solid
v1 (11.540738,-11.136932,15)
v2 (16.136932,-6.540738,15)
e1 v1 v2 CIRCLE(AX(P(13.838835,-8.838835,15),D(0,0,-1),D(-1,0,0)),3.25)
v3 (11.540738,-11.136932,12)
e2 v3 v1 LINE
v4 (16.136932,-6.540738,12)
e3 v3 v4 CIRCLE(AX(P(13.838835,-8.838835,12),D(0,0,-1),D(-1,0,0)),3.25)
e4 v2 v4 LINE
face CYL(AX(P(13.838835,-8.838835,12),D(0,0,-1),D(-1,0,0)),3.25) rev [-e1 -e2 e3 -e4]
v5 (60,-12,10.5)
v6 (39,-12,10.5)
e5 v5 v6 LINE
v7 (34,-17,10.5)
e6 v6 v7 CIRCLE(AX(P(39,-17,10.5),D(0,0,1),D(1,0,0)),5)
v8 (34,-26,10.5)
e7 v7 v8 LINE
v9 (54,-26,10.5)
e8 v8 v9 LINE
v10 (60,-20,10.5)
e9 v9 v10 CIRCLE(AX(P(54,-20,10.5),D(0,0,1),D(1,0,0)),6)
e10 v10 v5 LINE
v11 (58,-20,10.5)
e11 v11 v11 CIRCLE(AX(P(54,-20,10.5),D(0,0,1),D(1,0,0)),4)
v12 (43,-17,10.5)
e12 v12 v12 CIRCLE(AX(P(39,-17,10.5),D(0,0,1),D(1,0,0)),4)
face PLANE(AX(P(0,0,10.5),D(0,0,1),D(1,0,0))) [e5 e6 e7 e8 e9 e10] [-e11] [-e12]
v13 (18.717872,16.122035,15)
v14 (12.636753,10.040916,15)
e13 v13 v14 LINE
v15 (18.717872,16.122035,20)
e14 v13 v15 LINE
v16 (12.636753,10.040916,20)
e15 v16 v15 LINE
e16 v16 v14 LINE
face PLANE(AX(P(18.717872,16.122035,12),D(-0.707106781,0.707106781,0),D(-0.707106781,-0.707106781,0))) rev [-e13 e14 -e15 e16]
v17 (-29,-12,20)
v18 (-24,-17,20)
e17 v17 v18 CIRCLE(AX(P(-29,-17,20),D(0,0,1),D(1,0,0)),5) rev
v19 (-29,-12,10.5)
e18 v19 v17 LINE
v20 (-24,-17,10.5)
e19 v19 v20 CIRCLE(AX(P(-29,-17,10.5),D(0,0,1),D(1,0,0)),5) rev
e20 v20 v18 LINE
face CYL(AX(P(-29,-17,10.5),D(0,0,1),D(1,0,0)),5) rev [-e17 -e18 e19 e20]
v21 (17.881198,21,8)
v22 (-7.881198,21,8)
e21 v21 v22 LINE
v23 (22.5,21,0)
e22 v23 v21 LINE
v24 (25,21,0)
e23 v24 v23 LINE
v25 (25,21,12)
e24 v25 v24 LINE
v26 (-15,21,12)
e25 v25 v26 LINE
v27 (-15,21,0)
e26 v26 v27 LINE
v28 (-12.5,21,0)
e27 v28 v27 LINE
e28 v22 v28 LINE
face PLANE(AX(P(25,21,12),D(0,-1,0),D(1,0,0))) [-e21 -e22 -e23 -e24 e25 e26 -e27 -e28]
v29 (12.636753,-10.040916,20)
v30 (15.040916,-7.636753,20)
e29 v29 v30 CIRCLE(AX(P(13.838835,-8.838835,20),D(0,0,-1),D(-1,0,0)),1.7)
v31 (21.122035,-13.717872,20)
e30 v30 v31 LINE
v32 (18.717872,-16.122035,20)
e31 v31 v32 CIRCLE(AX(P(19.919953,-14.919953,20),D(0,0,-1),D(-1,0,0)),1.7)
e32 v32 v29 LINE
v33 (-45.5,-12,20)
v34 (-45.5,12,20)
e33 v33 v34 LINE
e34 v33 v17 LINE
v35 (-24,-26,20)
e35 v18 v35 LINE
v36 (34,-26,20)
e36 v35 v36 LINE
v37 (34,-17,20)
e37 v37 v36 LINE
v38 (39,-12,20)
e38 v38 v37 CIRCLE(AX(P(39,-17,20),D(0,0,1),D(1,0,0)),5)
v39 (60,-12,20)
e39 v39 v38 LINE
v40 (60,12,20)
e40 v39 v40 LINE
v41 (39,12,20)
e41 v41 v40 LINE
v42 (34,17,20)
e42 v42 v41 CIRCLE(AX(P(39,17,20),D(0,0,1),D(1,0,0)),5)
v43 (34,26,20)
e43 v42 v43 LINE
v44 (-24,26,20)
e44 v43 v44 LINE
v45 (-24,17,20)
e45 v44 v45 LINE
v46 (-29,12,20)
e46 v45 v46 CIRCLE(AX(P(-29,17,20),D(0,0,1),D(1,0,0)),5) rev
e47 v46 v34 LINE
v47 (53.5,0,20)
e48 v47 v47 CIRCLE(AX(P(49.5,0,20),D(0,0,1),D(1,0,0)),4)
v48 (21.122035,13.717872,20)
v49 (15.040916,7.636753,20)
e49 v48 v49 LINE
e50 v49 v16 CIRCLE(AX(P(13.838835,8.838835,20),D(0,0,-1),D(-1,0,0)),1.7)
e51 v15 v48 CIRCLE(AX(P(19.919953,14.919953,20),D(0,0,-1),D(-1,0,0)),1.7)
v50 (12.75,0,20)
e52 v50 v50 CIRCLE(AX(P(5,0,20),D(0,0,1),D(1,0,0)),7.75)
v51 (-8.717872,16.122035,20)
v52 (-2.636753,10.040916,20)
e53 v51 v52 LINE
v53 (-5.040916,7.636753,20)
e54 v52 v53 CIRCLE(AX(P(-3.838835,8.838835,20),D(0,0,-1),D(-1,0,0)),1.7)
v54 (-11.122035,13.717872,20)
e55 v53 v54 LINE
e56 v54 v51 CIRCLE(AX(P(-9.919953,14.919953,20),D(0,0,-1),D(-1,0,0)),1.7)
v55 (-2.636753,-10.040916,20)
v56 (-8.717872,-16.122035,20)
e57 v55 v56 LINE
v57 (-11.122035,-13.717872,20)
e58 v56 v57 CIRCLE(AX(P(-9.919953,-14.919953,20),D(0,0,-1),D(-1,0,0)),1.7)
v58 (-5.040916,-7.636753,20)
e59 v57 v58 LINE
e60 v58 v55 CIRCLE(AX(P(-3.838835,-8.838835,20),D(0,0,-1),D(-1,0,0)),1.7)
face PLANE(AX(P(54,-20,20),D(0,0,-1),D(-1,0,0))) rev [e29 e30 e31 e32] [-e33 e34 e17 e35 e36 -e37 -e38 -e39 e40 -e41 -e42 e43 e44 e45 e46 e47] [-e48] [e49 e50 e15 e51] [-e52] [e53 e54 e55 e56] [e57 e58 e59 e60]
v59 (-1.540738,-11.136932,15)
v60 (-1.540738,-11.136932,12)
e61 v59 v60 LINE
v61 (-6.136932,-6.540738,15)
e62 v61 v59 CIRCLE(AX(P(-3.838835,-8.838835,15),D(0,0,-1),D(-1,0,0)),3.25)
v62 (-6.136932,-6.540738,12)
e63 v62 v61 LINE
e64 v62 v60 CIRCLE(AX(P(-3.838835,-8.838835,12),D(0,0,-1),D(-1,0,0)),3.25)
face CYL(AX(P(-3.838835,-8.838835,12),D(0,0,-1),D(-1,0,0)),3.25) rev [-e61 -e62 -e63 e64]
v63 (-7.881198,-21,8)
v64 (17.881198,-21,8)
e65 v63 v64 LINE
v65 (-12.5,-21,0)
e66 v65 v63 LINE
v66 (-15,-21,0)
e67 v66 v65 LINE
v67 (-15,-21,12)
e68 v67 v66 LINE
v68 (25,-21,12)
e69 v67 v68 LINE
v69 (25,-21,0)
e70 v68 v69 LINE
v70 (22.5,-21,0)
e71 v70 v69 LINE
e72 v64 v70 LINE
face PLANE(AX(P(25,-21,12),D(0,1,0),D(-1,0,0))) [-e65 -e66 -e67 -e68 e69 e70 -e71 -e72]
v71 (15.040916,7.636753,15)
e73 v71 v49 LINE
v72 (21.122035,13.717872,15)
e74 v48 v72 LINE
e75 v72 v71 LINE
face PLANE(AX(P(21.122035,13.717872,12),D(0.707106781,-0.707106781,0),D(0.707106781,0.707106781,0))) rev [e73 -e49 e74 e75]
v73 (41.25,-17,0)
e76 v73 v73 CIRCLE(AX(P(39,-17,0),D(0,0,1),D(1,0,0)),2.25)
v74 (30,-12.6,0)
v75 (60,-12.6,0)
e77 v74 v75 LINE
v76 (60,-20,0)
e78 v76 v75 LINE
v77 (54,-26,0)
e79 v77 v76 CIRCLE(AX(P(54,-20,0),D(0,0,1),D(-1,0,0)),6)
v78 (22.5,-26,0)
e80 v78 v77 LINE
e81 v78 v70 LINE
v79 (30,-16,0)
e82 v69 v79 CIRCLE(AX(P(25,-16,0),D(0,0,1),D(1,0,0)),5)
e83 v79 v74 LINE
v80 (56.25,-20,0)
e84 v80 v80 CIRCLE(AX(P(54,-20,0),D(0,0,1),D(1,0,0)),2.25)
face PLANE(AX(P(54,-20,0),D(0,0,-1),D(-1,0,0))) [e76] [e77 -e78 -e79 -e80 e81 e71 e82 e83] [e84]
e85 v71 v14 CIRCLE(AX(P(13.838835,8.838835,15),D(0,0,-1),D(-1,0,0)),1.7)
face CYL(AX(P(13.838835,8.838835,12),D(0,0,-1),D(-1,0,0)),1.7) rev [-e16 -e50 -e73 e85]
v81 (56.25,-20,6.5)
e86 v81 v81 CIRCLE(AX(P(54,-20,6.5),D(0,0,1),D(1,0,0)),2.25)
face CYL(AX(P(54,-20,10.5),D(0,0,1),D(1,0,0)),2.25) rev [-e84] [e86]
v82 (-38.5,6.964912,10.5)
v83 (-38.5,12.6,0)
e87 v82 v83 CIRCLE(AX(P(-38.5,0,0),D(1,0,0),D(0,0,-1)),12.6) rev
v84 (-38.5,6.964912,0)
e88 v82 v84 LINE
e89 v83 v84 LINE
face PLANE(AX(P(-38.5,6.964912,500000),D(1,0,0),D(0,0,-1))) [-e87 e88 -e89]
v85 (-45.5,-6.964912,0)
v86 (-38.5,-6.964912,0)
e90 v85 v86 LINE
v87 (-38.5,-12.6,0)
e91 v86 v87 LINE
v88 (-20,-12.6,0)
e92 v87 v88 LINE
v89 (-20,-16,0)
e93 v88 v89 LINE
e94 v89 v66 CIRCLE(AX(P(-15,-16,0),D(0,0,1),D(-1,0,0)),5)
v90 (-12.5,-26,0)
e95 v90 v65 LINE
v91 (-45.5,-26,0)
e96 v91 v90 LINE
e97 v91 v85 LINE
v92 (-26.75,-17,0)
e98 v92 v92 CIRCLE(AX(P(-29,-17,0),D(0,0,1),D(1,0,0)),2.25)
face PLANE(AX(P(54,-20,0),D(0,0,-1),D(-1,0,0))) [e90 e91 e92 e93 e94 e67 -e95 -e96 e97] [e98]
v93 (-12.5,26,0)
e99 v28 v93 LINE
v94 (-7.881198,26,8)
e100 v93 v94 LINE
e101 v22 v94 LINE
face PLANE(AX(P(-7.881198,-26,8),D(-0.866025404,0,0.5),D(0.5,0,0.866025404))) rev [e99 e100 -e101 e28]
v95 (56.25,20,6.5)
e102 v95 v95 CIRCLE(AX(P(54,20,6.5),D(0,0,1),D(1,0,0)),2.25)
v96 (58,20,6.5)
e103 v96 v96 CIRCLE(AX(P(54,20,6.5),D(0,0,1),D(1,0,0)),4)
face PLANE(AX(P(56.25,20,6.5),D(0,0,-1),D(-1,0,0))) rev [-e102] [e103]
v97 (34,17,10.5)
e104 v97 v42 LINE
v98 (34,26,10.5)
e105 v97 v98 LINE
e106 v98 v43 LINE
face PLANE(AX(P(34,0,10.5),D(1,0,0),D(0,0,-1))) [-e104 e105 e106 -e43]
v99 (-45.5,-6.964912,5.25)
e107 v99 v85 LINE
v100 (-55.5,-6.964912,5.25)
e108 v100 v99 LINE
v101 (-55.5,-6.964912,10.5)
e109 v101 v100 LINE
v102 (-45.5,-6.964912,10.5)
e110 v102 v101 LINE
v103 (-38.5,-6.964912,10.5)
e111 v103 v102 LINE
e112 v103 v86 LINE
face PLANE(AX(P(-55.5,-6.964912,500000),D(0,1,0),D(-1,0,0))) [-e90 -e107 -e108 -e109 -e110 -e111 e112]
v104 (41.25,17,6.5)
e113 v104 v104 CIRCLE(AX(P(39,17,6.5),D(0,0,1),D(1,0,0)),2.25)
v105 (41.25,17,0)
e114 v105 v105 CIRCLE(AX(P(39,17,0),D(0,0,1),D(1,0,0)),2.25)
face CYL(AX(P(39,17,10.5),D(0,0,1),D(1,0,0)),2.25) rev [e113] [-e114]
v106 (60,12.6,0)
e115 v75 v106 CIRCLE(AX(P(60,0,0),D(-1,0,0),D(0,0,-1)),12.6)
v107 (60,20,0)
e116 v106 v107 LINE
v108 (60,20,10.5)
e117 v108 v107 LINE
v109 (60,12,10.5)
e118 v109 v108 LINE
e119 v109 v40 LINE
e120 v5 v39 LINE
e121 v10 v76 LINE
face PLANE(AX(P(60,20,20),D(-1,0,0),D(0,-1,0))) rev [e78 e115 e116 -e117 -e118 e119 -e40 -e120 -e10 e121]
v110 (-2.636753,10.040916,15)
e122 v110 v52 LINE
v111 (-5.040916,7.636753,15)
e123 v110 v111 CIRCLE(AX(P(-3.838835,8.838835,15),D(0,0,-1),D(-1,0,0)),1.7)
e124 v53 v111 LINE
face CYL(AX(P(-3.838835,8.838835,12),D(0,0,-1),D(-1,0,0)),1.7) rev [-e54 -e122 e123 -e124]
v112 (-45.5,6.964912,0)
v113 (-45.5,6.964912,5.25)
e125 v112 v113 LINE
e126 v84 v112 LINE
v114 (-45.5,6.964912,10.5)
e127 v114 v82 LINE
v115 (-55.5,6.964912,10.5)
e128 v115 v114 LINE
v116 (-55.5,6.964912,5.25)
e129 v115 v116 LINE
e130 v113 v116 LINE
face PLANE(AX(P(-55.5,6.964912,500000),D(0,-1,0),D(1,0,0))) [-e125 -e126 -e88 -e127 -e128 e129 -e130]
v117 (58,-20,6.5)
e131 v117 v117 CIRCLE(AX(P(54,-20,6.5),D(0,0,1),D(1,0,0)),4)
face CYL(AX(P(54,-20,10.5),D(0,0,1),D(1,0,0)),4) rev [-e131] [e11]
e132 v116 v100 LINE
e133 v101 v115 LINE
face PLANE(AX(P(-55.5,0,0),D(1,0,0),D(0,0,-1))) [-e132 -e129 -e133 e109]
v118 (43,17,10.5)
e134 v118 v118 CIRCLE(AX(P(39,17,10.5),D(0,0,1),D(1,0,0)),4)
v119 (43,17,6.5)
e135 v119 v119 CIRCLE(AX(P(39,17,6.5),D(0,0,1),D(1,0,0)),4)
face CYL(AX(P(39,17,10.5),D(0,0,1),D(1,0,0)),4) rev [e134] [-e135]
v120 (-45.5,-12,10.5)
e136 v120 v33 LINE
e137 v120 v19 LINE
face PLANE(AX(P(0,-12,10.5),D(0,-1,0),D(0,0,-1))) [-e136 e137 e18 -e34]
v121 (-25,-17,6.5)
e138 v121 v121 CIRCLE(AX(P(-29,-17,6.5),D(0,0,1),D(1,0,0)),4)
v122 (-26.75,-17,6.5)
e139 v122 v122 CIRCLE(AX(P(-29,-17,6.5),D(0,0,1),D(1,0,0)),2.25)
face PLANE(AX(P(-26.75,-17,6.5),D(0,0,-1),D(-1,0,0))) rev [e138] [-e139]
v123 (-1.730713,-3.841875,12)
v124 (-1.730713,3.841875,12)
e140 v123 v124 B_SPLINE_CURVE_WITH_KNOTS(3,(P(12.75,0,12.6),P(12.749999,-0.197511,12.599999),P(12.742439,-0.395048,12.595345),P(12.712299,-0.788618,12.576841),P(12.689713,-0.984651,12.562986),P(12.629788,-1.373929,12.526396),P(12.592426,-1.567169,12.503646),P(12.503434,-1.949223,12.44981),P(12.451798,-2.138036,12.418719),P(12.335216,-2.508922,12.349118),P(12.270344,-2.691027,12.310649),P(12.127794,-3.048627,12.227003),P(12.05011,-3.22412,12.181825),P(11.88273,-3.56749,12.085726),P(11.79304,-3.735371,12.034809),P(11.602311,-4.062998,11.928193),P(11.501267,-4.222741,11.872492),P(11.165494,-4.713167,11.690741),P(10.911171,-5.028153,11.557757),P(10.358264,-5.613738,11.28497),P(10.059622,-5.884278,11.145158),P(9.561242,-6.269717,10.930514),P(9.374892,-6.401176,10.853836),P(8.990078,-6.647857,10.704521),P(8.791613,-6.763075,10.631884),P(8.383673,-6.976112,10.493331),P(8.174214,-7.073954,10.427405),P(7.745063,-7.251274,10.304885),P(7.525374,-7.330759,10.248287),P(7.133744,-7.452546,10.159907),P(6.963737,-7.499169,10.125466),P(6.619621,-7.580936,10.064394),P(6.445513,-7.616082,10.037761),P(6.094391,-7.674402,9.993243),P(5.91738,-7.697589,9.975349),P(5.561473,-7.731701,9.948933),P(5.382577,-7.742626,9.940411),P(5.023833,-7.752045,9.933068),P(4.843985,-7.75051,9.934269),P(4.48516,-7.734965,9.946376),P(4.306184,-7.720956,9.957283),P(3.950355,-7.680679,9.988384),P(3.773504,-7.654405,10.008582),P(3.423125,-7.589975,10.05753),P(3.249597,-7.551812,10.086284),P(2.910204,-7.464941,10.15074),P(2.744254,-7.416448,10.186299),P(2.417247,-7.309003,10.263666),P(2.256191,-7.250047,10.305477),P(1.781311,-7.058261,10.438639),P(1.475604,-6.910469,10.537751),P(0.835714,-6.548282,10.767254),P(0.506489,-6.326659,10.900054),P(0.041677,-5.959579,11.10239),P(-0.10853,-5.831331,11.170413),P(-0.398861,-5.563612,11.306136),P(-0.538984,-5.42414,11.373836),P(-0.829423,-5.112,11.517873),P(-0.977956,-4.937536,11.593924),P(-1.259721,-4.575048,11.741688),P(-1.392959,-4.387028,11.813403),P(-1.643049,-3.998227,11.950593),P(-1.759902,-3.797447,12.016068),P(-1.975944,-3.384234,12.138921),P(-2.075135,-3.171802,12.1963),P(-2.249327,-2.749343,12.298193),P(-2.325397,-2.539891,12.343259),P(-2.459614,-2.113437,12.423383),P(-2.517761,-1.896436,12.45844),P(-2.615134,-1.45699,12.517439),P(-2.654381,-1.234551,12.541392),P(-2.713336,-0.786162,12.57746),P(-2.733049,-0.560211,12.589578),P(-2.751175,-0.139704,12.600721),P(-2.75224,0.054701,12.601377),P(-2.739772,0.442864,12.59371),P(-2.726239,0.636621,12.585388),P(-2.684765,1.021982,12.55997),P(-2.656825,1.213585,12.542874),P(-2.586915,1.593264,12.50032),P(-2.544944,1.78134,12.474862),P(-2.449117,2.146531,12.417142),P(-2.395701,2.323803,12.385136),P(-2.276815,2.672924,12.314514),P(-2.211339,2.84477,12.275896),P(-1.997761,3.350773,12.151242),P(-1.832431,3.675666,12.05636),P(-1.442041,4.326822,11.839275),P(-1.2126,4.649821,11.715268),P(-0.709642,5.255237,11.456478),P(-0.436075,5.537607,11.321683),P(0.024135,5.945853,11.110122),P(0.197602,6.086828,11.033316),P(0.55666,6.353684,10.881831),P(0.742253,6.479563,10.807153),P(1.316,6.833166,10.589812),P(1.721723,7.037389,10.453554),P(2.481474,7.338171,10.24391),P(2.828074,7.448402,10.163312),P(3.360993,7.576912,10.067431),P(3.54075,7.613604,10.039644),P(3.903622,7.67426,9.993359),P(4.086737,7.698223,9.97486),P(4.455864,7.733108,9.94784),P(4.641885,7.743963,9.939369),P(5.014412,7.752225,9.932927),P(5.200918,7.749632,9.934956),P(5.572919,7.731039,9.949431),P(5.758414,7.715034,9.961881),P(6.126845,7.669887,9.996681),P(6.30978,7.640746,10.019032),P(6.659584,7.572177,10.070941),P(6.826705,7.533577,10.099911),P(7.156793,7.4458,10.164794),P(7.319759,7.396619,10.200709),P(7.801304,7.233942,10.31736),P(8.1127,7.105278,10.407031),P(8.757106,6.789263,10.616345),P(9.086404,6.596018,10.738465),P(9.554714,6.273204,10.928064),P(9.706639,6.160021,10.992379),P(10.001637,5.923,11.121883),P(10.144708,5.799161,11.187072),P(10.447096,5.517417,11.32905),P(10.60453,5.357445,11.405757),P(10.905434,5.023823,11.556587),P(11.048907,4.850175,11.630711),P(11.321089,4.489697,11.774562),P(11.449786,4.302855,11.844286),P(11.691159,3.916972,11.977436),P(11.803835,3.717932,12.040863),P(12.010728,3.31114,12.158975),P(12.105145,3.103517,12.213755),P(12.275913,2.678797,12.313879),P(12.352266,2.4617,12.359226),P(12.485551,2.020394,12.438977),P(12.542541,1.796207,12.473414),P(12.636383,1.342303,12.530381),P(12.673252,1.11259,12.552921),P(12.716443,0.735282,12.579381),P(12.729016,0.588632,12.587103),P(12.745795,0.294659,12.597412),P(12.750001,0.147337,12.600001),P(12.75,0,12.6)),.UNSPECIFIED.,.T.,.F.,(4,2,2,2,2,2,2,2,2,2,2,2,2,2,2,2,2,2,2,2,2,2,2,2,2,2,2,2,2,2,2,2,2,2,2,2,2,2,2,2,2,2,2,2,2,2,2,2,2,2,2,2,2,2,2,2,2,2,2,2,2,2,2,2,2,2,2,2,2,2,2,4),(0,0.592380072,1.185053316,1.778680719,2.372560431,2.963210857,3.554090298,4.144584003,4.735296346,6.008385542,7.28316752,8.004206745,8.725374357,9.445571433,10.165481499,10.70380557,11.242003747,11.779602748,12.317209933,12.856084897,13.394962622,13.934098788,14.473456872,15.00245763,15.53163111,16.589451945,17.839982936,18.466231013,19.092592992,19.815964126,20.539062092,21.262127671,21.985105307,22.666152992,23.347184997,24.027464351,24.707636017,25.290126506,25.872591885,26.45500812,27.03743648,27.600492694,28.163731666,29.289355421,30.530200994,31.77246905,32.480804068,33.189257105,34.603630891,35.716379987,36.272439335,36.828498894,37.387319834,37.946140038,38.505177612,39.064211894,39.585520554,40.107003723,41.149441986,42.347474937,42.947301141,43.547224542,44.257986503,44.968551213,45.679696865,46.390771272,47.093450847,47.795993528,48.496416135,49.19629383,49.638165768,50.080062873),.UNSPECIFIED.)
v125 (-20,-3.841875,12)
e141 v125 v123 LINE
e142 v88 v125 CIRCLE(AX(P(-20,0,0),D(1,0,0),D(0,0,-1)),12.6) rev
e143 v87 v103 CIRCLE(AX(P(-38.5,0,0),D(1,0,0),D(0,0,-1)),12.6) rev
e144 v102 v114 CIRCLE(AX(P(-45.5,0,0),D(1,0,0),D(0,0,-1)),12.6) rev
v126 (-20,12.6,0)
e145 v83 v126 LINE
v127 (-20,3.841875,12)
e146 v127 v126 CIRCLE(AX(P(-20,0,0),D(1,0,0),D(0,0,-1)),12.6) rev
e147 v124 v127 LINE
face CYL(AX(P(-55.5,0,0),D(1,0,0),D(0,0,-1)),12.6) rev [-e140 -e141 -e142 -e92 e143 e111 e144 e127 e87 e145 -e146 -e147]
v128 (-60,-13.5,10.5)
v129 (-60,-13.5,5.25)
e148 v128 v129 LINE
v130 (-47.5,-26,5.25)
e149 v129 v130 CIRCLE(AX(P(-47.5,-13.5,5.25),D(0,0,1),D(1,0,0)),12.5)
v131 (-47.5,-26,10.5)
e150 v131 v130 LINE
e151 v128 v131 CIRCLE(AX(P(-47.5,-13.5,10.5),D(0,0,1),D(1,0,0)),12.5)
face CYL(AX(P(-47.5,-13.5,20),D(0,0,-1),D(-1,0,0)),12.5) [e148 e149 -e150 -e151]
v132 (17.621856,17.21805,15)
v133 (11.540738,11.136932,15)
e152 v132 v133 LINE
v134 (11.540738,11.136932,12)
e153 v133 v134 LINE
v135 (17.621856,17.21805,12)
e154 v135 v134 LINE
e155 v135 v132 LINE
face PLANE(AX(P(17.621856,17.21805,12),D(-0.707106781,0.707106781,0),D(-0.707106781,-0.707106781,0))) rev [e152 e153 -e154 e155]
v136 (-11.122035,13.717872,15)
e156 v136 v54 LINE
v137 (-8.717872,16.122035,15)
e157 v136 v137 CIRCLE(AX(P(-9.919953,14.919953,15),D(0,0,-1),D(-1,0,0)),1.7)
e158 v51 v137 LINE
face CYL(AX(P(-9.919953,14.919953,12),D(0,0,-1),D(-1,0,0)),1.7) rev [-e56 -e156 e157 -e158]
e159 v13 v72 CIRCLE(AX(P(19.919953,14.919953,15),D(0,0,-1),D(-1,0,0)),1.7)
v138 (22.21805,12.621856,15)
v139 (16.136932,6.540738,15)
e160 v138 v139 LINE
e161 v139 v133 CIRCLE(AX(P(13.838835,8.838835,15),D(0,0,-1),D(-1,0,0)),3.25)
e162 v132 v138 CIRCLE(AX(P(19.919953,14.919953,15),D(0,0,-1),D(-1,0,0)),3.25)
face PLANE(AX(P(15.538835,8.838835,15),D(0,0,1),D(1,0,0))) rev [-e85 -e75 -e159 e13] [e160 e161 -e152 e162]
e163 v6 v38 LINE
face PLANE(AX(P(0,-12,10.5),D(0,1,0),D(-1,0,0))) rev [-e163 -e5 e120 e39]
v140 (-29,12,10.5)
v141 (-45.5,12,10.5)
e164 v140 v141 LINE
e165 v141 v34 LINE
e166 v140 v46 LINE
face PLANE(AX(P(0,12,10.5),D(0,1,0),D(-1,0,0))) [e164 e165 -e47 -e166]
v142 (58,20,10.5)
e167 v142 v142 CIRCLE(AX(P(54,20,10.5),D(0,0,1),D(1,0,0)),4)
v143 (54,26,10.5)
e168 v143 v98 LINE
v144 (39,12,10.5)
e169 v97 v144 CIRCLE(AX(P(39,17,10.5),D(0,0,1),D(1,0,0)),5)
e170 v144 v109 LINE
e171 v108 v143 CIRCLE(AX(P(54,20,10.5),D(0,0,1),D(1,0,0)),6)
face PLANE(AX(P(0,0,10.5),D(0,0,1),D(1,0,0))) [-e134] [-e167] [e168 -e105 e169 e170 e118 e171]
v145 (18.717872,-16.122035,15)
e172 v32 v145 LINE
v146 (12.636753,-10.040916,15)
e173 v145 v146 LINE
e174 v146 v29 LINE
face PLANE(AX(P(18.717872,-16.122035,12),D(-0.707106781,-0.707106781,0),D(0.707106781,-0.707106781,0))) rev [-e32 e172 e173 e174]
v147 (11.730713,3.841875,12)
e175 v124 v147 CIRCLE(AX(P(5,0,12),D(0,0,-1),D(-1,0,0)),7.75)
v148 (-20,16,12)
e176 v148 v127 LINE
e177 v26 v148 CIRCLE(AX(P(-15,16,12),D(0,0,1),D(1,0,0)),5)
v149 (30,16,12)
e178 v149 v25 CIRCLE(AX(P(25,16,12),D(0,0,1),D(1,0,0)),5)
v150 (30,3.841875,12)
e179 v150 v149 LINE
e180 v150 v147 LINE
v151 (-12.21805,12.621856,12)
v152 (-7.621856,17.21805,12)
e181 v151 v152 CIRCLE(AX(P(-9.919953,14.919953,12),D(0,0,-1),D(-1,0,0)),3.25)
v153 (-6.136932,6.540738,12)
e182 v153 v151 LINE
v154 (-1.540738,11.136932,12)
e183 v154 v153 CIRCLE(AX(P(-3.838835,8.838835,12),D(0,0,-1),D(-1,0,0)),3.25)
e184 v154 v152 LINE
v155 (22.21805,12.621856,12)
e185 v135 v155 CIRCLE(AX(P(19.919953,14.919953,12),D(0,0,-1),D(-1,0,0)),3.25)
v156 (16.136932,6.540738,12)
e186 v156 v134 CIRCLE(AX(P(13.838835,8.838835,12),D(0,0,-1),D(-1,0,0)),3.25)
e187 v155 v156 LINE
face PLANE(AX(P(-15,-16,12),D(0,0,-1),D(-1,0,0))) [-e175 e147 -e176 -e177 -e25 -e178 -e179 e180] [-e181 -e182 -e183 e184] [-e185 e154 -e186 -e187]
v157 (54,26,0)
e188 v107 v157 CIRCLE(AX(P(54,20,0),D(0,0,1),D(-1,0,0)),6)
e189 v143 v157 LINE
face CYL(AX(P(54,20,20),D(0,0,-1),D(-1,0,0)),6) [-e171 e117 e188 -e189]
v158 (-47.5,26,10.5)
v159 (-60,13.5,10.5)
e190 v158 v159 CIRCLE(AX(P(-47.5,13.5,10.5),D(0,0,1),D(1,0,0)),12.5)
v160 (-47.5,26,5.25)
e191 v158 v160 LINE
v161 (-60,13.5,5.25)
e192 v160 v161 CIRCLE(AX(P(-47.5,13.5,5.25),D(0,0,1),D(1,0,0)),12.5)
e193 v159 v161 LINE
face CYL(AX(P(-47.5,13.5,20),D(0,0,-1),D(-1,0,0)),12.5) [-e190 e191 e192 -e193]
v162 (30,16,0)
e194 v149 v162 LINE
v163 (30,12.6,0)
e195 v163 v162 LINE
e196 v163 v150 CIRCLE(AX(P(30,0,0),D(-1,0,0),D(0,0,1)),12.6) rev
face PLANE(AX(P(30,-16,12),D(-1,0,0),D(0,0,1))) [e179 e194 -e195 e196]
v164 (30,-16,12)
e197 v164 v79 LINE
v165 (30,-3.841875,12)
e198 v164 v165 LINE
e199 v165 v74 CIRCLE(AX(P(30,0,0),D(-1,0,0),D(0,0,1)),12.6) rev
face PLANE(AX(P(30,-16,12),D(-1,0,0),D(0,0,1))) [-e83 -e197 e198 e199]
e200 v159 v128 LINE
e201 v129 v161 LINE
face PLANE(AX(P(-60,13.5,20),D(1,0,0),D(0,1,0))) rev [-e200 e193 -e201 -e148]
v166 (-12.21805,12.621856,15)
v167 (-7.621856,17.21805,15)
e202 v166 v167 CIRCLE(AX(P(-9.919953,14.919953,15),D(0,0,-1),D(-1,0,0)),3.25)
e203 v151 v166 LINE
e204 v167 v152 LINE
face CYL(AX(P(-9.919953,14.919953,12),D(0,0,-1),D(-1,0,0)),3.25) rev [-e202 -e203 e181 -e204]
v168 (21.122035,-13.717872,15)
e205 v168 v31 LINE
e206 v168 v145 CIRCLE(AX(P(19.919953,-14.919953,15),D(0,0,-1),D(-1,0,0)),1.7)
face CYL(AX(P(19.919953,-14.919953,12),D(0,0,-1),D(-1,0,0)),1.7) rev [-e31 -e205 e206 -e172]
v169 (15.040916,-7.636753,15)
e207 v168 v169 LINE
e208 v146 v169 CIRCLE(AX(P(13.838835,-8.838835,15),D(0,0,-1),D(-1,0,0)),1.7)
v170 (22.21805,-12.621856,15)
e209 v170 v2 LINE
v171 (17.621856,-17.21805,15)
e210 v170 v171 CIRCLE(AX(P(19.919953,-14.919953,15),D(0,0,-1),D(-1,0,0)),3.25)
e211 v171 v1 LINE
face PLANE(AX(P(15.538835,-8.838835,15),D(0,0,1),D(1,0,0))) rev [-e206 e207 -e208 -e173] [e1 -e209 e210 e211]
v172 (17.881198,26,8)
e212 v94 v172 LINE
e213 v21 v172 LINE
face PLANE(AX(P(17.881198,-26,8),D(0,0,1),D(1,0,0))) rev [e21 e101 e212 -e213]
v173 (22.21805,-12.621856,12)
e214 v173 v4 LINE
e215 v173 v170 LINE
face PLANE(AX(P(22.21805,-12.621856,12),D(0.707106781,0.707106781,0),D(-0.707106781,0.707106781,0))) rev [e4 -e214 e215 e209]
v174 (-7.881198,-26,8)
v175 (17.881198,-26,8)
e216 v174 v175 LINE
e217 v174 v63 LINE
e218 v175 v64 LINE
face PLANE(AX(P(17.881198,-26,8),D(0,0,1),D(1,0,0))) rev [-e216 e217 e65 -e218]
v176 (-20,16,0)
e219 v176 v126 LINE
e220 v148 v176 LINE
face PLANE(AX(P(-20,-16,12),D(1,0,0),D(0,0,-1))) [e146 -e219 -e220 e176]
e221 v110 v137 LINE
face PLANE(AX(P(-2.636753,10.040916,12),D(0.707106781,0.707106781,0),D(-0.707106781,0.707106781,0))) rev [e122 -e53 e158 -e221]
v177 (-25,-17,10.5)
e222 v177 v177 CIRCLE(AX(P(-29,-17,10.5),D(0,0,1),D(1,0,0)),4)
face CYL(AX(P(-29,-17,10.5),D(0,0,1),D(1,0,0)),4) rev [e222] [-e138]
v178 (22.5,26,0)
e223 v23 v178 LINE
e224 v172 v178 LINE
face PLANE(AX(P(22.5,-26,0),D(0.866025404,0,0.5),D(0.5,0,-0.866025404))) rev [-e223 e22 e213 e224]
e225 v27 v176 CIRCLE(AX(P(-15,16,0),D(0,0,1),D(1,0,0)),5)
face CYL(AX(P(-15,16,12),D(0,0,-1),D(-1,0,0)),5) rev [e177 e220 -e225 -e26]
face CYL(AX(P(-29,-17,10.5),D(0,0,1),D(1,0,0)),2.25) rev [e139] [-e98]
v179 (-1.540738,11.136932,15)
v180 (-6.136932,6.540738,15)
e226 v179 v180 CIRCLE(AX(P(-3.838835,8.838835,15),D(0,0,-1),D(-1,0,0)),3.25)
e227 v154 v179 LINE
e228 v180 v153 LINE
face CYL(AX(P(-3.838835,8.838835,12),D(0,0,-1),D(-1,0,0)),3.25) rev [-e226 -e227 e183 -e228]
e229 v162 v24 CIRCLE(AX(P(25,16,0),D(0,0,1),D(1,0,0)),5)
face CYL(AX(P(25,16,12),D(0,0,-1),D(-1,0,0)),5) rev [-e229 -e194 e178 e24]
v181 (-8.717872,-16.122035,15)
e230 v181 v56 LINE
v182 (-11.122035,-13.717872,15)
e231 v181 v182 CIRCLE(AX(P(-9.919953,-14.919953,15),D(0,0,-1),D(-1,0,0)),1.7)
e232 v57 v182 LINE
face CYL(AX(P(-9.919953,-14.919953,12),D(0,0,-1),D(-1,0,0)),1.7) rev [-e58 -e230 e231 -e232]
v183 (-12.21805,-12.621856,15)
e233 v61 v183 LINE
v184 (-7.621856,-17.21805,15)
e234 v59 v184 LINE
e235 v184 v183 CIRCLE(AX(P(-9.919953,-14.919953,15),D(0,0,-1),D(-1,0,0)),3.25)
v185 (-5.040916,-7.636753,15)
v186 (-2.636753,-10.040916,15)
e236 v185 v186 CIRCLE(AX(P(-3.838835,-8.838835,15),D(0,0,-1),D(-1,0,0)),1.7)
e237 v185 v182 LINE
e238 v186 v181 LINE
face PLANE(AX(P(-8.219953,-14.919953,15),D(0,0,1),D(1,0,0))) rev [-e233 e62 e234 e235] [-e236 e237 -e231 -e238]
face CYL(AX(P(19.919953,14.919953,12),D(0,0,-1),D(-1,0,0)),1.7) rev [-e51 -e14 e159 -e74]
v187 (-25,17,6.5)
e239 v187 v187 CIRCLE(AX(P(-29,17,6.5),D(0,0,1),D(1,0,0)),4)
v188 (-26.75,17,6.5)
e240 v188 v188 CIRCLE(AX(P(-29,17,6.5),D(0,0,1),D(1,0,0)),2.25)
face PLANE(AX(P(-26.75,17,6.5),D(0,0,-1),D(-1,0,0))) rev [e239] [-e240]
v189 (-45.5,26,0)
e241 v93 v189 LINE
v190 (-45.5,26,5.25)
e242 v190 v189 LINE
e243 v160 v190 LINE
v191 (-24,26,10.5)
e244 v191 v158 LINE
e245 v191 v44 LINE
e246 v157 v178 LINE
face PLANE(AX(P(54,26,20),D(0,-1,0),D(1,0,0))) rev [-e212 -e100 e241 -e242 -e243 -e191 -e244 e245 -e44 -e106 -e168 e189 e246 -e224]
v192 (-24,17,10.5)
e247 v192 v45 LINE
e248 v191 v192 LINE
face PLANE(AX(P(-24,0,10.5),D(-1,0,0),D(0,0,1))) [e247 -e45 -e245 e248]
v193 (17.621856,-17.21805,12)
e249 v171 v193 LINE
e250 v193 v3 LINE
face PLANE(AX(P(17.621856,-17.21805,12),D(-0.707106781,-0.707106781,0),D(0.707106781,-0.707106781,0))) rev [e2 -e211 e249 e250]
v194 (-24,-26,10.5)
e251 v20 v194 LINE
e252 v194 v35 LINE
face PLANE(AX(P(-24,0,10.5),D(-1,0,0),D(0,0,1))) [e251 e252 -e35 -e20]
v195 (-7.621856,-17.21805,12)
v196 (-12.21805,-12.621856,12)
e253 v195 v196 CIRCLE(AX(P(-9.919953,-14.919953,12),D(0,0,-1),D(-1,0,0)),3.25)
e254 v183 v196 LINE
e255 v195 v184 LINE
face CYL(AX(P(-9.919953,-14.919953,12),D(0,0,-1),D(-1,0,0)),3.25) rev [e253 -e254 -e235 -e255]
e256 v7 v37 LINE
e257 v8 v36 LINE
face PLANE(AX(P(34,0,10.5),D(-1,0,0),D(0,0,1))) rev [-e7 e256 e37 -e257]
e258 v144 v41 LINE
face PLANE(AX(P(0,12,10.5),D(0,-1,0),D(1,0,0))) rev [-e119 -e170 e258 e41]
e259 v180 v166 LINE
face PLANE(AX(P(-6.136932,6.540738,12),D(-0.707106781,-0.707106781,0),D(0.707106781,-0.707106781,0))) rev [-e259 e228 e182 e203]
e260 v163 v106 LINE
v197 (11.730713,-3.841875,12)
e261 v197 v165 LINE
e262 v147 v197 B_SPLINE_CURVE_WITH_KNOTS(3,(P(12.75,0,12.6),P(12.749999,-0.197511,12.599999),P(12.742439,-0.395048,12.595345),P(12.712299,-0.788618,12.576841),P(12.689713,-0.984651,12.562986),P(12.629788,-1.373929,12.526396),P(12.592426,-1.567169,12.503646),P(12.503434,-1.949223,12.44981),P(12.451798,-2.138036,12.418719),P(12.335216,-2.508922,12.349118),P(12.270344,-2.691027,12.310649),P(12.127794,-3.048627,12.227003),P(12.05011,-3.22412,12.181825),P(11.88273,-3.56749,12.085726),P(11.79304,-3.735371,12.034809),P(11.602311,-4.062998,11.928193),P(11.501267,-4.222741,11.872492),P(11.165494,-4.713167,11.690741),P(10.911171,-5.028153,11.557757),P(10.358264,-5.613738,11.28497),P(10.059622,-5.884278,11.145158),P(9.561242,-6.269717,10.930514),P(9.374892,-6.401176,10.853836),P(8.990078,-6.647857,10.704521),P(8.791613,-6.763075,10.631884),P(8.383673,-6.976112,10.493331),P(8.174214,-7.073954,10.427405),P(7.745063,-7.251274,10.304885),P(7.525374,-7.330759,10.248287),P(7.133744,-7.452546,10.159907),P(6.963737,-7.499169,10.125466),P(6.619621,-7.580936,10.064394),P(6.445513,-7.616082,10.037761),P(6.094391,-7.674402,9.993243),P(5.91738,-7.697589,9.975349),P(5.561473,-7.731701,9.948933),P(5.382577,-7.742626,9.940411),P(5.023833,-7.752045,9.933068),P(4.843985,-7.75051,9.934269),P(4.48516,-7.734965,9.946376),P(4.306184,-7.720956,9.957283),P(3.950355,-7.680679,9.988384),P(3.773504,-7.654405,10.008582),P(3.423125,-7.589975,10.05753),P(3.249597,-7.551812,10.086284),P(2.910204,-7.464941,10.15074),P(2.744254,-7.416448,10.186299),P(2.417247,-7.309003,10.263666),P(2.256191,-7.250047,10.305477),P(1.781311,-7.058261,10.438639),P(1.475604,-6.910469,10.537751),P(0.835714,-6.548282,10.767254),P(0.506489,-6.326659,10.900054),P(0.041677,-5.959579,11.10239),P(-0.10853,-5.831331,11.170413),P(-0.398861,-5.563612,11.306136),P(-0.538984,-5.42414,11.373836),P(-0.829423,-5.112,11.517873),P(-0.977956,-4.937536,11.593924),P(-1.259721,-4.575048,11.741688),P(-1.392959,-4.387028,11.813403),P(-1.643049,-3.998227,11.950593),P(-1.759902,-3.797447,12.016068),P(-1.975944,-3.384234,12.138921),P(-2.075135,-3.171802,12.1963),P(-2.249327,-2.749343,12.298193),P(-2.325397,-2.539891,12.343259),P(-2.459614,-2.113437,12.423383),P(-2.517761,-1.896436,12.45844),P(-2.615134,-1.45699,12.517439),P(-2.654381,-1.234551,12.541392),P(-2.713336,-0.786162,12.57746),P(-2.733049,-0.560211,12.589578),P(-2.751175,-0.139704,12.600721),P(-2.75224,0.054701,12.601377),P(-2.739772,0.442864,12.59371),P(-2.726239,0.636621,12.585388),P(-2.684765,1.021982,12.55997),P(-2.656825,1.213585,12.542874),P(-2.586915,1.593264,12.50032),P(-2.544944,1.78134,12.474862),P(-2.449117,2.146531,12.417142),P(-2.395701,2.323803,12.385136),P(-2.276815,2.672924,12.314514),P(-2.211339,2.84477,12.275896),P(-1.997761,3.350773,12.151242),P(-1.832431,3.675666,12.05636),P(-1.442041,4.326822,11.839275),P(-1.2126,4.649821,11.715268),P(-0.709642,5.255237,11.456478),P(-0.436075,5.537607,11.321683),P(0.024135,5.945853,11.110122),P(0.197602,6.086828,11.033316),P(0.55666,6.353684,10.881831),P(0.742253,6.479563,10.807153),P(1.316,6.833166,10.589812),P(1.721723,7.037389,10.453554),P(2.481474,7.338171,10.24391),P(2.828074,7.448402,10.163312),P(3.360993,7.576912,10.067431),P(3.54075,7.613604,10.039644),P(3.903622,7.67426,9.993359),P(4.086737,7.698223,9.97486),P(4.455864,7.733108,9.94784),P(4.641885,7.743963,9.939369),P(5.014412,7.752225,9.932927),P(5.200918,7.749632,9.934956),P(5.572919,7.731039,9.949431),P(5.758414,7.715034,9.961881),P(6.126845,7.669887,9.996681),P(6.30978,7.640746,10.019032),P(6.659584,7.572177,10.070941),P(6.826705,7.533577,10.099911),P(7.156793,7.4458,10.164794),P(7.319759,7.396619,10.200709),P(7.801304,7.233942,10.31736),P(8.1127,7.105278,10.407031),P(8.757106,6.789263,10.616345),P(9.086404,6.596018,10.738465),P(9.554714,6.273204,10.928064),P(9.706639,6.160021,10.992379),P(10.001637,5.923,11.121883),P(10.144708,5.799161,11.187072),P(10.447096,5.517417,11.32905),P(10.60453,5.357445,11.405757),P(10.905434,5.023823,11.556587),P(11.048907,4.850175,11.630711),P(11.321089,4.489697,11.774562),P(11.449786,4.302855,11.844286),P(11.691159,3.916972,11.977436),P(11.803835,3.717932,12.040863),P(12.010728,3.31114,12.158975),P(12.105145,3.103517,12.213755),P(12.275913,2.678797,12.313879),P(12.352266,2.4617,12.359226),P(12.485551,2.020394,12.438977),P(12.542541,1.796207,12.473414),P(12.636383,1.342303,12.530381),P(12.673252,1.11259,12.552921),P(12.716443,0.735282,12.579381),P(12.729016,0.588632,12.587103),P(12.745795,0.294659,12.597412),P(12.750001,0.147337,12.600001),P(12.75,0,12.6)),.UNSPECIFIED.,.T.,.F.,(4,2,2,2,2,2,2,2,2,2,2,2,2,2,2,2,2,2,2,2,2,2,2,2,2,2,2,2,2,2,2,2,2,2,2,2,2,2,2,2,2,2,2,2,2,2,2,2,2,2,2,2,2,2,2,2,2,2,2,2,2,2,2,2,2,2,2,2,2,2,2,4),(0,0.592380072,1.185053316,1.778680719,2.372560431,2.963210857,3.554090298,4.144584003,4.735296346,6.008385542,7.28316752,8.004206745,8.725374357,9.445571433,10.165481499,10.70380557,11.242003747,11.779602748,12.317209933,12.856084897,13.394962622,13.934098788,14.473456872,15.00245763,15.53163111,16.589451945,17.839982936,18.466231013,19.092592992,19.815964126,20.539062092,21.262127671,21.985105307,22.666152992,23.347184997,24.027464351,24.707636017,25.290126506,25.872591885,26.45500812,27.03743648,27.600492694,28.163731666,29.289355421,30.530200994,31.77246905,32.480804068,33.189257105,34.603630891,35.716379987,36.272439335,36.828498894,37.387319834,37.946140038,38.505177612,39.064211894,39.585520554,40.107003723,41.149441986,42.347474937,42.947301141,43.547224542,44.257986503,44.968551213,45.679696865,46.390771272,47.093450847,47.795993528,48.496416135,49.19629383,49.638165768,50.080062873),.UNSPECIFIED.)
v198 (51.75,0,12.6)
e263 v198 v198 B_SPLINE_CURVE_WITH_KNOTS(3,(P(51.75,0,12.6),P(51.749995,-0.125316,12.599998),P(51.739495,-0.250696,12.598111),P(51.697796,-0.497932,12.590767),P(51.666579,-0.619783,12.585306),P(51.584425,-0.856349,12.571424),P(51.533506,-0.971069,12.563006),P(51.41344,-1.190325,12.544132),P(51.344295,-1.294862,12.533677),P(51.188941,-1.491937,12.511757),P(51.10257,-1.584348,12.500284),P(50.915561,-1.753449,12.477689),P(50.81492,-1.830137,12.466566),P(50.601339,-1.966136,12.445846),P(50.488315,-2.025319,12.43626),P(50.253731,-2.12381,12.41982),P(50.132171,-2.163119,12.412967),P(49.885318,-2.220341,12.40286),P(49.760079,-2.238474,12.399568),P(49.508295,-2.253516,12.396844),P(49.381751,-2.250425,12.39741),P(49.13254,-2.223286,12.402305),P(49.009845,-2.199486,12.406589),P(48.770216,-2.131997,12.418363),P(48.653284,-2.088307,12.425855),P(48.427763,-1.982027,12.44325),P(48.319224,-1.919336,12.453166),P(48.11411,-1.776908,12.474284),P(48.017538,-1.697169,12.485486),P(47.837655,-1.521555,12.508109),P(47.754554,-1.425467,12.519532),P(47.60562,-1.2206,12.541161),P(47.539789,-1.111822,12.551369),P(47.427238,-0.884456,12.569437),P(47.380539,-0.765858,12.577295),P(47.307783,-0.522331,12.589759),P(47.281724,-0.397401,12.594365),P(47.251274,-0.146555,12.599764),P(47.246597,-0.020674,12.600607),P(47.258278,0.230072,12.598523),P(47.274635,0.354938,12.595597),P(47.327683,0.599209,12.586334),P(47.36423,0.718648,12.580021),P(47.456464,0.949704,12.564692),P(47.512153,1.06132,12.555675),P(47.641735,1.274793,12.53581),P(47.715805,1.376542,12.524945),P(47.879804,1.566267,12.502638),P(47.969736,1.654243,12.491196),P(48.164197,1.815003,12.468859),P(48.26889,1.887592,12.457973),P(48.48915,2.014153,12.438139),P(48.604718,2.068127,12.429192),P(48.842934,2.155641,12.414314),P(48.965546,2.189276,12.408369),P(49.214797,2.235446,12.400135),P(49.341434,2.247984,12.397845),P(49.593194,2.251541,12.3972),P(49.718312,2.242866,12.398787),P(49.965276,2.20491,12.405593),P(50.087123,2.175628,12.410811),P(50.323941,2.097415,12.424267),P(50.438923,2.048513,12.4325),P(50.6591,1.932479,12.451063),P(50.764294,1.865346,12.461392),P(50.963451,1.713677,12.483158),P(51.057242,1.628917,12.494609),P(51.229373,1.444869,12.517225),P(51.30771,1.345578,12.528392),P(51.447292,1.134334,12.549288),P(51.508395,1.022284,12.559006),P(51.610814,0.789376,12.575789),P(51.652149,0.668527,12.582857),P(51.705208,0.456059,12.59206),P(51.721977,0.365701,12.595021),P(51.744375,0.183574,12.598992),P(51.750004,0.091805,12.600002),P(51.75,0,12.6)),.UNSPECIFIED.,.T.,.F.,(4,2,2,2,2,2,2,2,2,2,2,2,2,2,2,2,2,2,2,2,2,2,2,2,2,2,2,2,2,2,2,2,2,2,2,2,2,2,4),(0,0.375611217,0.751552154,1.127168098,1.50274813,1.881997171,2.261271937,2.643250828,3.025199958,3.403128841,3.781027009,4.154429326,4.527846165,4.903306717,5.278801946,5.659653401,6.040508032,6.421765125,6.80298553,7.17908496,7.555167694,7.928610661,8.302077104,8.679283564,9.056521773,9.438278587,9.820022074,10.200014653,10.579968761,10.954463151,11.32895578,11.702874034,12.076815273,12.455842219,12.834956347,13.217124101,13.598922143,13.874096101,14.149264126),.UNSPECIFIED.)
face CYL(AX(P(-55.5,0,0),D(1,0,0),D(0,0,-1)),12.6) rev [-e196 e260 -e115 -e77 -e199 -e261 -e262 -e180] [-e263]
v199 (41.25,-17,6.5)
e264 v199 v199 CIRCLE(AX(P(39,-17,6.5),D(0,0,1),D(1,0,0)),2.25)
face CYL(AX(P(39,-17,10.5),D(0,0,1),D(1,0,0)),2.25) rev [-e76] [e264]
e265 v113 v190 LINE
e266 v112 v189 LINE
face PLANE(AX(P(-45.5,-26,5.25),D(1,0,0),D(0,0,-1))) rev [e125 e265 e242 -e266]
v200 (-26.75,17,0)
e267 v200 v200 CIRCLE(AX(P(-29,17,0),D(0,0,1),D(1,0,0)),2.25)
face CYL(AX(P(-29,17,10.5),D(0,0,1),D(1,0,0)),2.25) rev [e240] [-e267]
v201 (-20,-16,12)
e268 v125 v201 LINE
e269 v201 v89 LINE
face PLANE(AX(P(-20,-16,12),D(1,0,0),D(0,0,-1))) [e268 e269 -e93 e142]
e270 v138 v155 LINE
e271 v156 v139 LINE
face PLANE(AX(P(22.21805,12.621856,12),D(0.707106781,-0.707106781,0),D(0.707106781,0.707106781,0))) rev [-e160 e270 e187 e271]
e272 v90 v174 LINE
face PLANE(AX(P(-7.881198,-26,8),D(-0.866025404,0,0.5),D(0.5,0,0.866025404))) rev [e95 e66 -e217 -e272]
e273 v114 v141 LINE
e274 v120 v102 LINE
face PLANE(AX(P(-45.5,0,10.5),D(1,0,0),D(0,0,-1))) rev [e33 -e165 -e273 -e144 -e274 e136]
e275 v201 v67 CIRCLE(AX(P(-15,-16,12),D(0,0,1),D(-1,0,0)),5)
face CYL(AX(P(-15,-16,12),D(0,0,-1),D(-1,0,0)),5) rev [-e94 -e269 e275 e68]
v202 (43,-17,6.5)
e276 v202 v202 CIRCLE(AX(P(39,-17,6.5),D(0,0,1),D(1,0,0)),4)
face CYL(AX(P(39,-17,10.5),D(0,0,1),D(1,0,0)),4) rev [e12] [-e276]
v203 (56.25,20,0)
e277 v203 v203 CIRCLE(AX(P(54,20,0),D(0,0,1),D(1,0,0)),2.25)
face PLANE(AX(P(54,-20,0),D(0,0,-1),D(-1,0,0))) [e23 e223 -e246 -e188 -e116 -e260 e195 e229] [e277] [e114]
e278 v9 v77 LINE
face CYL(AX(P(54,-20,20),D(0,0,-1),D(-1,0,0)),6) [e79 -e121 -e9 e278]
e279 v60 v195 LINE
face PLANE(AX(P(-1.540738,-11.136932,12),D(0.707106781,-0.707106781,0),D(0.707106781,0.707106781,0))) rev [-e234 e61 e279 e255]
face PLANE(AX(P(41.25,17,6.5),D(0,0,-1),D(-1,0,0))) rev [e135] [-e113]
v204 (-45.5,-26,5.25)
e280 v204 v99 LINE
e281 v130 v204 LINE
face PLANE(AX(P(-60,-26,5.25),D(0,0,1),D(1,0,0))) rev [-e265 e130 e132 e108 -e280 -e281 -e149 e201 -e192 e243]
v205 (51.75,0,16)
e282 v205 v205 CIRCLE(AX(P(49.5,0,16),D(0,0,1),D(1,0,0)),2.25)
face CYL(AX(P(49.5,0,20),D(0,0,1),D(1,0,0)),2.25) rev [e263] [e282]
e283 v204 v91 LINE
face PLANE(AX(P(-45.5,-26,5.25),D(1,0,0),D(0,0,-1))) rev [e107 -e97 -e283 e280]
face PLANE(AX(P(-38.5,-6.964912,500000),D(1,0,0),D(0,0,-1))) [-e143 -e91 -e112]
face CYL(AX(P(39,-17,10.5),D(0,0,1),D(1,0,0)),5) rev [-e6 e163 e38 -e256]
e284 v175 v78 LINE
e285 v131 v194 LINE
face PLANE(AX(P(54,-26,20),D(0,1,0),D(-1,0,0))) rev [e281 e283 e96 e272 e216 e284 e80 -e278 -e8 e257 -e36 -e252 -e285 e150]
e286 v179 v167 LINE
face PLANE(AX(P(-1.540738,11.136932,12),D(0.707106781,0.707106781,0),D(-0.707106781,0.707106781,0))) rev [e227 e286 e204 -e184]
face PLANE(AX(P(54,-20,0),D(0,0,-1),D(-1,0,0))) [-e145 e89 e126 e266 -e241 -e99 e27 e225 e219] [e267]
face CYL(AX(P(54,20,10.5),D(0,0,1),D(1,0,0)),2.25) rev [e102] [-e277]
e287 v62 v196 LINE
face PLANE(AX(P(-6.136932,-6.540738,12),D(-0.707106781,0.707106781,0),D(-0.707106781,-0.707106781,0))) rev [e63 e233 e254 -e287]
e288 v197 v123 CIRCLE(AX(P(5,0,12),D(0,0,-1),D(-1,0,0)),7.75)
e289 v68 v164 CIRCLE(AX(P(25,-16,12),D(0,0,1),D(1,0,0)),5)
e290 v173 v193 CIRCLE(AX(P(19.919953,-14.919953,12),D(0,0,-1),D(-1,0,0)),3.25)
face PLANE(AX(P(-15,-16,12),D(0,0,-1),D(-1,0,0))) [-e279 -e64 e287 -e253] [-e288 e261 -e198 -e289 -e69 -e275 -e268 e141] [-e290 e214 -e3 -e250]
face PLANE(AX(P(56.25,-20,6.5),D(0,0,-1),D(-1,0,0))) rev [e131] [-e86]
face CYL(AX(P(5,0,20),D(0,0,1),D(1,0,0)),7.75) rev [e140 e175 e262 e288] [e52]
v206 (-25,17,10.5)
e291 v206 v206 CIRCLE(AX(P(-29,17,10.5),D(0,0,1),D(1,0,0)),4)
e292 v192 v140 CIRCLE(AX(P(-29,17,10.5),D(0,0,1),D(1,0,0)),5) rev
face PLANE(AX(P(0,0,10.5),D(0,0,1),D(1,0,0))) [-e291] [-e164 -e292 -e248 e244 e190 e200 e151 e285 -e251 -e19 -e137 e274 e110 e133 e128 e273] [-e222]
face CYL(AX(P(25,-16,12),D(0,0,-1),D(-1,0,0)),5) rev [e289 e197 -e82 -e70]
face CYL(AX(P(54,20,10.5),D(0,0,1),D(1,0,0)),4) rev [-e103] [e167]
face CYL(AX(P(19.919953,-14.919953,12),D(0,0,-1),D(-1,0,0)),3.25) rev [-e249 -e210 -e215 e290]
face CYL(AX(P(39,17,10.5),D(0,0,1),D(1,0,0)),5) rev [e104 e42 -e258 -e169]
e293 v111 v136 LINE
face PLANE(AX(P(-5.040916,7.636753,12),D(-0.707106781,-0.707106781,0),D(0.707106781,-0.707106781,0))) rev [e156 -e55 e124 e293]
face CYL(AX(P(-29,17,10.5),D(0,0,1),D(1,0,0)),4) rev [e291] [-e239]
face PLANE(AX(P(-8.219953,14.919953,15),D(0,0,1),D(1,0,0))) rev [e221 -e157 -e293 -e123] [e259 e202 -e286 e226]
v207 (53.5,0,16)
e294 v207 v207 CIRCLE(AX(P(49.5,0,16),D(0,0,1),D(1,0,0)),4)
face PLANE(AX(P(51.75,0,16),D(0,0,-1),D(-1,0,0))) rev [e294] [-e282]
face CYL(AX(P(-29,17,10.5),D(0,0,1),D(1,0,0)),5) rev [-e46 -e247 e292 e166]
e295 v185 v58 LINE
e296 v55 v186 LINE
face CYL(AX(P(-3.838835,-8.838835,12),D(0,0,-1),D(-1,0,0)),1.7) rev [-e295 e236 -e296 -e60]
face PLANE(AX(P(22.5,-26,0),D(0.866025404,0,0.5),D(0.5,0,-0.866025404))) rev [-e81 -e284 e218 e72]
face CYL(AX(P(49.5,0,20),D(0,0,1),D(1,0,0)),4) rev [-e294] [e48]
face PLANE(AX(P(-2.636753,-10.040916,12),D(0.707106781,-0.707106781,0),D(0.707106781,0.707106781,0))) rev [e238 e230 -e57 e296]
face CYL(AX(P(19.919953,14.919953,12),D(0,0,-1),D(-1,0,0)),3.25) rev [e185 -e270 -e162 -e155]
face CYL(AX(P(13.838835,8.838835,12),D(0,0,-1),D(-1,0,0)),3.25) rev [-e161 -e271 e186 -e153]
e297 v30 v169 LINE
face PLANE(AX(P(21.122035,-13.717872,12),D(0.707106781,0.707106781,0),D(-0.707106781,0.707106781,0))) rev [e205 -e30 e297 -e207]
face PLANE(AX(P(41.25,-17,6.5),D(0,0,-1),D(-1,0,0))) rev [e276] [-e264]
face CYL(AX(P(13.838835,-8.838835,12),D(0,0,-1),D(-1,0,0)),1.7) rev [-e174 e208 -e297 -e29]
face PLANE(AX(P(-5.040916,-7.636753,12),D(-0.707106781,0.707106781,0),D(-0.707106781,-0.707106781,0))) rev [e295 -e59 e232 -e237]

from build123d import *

# Parameters (mm, degrees)
BOSS_EXTRUDE2_DEPTH             = 20
CUT_EXTRUDE1_START              = -9.5
CUT_EXTRUDE1_DEPTH              = 9.5
CBORE_FOR_M4_SHCS1_D            = 4.5
CBORE_FOR_M4_SHCS1_CBORE_D      = 8
CBORE_FOR_M4_SHCS1_CBORE_DEPTH  = 4
CUT_EXTRUDE2_DEPTH              = 12
CUT_EXTRUDE3_DEPTH              = 69.381283989
CUT_EXTRUDE3_DEPTH_BACK         = 69.381283989
CBORE_START                     = 12
CBORE_SLOT_FOR_M3_SHCS1_DEPTH   = 8
CBORE_SLOT_FOR_M3_SHCS1_2_DEPTH = 3
CUT_EXTRUDE4_DEPTH              = 10
CUT_EXTRUDE4_DEPTH_BACK         = 111.48189897
M14_CLEARANCE_HOLE1_D           = 15.5
CBORE_FOR_M4_SHCS2_D            = 4.5
CBORE_FOR_M4_SHCS2_CBORE_D      = 8
CBORE_FOR_M4_SHCS2_CBORE_DEPTH  = 4
BOSS_EXTRUDE3_REACH             = 70.381
SKETCH16_W                      = 17
SKETCH16_H                      = 5.63508794
CUT_EXTRUDE5_DEPTH              = 69.381284106
CUT_EXTRUDE5_DEPTH_BACK         = 69.381284106
SKETCH18_W                      = 14.5
SKETCH18_H                      = 5.25


# Read off the part's stored shape, not the designer's step: CBORE SLOT for M3 SHCS1
with BuildPart() as part:
    # Sketch2 → Boss-Extrude2 (new body)
    with BuildSketch(Plane.XY):
        with BuildLine():
            Line((54, 26), (-47.5, 26))
            ThreePointArc((-47.5, 26), (-56.338834765, 22.338834765), (-60, 13.5))
            Line((-60, 13.5), (-60, -13.5))
            ThreePointArc((-60, -13.5), (-56.338834765, -22.338834765), (-47.5, -26))
            Line((-47.5, -26), (54, -26))
            ThreePointArc((54, -26), (58.242640687, -24.242640687), (60, -20))
            Line((60, -20), (60, 20))
            ThreePointArc((60, 20), (58.242640687, 24.242640687), (54, 26))
        make_face()
    extrude(amount=BOSS_EXTRUDE2_DEPTH)

    # Sketch3 → Cut-Extrude1 (cut)
    with BuildSketch(Plane.XY.offset(20).offset(CUT_EXTRUDE1_START)):
        with BuildLine():
            Line((-47.5, -26), (-24, -26))
            Line((-24, -26), (-24, -17))
            ThreePointArc((-24, -17), (-25.464466094, -13.464466094), (-29, -12))
            Line((-29, -12), (-45.5, -12))
            Line((-45.5, -12), (-45.5, 12))
            Line((-45.5, 12), (-29, 12))
            ThreePointArc((-29, 12), (-25.464466094, 13.464466094), (-24, 17))
            Line((-24, 17), (-24, 26))
            Line((-24, 26), (-47.5, 26))
            ThreePointArc((-47.5, 26), (-56.338834765, 22.338834765), (-60, 13.5))
            Line((-60, 13.5), (-60, -13.5))
            ThreePointArc((-60, -13.5), (-56.338834765, -22.338834765), (-47.5, -26))
        make_face()
        with BuildLine():
            Line((39, 12), (60, 12))
            Line((60, 12), (60, 20))
            ThreePointArc((60, 20), (58.242640687, 24.242640687), (54, 26))
            Line((54, 26), (34, 26))
            Line((34, 26), (34, 17))
            ThreePointArc((34, 17), (35.464466094, 13.464466094), (39, 12))
        make_face()
        with BuildLine():
            Line((60, -20), (60, -12))
            Line((60, -12), (39, -12))
            ThreePointArc((39, -12), (35.464466094, -13.464466094), (34, -17))
            Line((34, -17), (34, -26))
            Line((34, -26), (54, -26))
            ThreePointArc((54, -26), (58.242640687, -24.242640687), (60, -20))
        make_face()
    extrude(amount=CUT_EXTRUDE1_DEPTH, mode=Mode.SUBTRACT)

    # CBORE for M4 SHCS1 (through all)
    with Locations(Plane.XY.offset(10.5)):
        with Locations((39, -17), (39, 17), (-29, 17), (-29, -17), (54, 20), (54, -20)):
            CounterBoreHole(CBORE_FOR_M4_SHCS1_D / 2, CBORE_FOR_M4_SHCS1_CBORE_D / 2, CBORE_FOR_M4_SHCS1_CBORE_DEPTH)

    # Sketch6 → Cut-Extrude2 (cut)
    with BuildSketch(Plane.XY):
        with BuildLine():
            Line((25, -21), (-15, -21))
            ThreePointArc((-15, -21), (-18.535533906, -19.535533906), (-20, -16))
            Line((-20, -16), (-20, 16))
            ThreePointArc((-20, 16), (-18.535533906, 19.535533906), (-15, 21))
            Line((-15, 21), (25, 21))
            ThreePointArc((25, 21), (28.535533906, 19.535533906), (30, 16))
            Line((30, 16), (30, -16))
            ThreePointArc((30, -16), (28.535533906, -19.535533906), (25, -21))
        make_face()
    extrude(amount=CUT_EXTRUDE2_DEPTH, mode=Mode.SUBTRACT)

    # Sketch7 → Cut-Extrude3 (cut, two sides: drawn at the far end of the back side and taken through both)
    with BuildSketch(Plane(origin=(0, 0, 0), x_dir=(1, 0, 0), z_dir=(0, 1, 0)).offset(-CUT_EXTRUDE3_DEPTH_BACK)):
        Polygon((-12.5, 0), (22.5, 0), (17.881197846, -8), (-7.881197846, -8), align=None)
    extrude(amount=CUT_EXTRUDE3_DEPTH + CUT_EXTRUDE3_DEPTH_BACK, mode=Mode.SUBTRACT)

    # CBORE SLOT for M3 SHCS1 outline → CBORE SLOT for M3 SHCS1 (cut)
    with BuildSketch(Plane.XY.offset(CBORE_START)):
        with BuildLine():
            ThreePointArc((-8.717871555, 16.122034611), (-11.122034611, 16.122034611), (-11.122034611, 13.717871555))
            Line((-11.122034611, 13.717871555), (-5.040916293, 7.636753237))
            ThreePointArc((-5.040916293, 7.636753237), (-2.636753237, 7.636753237), (-2.636753237, 10.040916293))
            Line((-2.636753237, 10.040916293), (-8.717871555, 16.122034611))
        make_face()
        with BuildLine():
            ThreePointArc((18.717871555, -16.122034611), (21.122034611, -16.122034611), (21.122034611, -13.717871555))
            Line((21.122034611, -13.717871555), (15.040916293, -7.636753237))
            ThreePointArc((15.040916293, -7.636753237), (12.636753237, -7.636753237), (12.636753237, -10.040916293))
            Line((12.636753237, -10.040916293), (18.717871555, -16.122034611))
        make_face()
    cbore_slot_for_m3_shcs1 = extrude(amount=CBORE_SLOT_FOR_M3_SHCS1_DEPTH, mode=Mode.SUBTRACT)

    # CBORE SLOT for M3 SHCS1 2 outline → CBORE SLOT for M3 SHCS1 2 (cut)
    # profile 1 of 2: a face of its own
    with BuildSketch(Plane.XY.offset(CBORE_START)):
        with BuildLine():
            ThreePointArc((-7.621856044, 17.218050122), (-12.218050122, 17.218050122), (-12.218050122, 12.621856044))
            Line((-12.218050122, 12.621856044), (-6.136931804, 6.540737726))
            ThreePointArc((-6.136931804, 6.540737726), (-1.540737726, 6.540737726), (-1.540737726, 11.136931804))
            Line((-1.540737726, 11.136931804), (-7.621856044, 17.218050122))
        make_face()
        with BuildLine():
            Line((-5.040916293, 7.636753237), (-11.122034611, 13.717871555))
            ThreePointArc((-11.122034611, 13.717871555), (-11.122034611, 16.122034611), (-8.717871555, 16.122034611))
            Line((-8.717871555, 16.122034611), (-2.636753237, 10.040916293))
            ThreePointArc((-2.636753237, 10.040916293), (-2.636753237, 7.636753237), (-5.040916293, 7.636753237))
        make_face(mode=Mode.SUBTRACT)
    # profile 2 of 2: a face of its own
    with BuildSketch(Plane.XY.offset(CBORE_START)):
        with BuildLine():
            ThreePointArc((17.621856044, -17.218050122), (22.218050122, -17.218050122), (22.218050122, -12.621856044))
            Line((22.218050122, -12.621856044), (16.136931804, -6.540737726))
            ThreePointArc((16.136931804, -6.540737726), (11.540737726, -6.540737726), (11.540737726, -11.136931804))
            Line((11.540737726, -11.136931804), (17.621856044, -17.218050122))
        make_face()
        with BuildLine():
            Line((15.040916293, -7.636753237), (21.122034611, -13.717871555))
            ThreePointArc((21.122034611, -13.717871555), (21.122034611, -16.122034611), (18.717871555, -16.122034611))
            Line((18.717871555, -16.122034611), (12.636753237, -10.040916293))
            ThreePointArc((12.636753237, -10.040916293), (12.636753237, -7.636753237), (15.040916293, -7.636753237))
        make_face(mode=Mode.SUBTRACT)
    cbore_slot_for_m3_shcs1_2 = extrude(amount=CBORE_SLOT_FOR_M3_SHCS1_2_DEPTH, mode=Mode.SUBTRACT)

    # Mirror1: CBORE SLOT for M3 SHCS1, CBORE SLOT for M3 SHCS1 2 across plane
    add(cbore_slot_for_m3_shcs1.mirror(Plane.ZX), mode=Mode.SUBTRACT)
    add(cbore_slot_for_m3_shcs1_2.mirror(Plane.ZX), mode=Mode.SUBTRACT)

    # Sketch10 → Cut-Extrude4 (cut, two sides: drawn at the far end of the back side and taken through both)
    with BuildSketch(Plane.ZY.offset(45.5).offset(-CUT_EXTRUDE4_DEPTH_BACK)):
        with BuildLine():
            Line((0, 12.6), (0, -12.6))
            ThreePointArc((0, -12.6), (12.6, 0), (0, 12.6))
        make_face()
    extrude(amount=CUT_EXTRUDE4_DEPTH + CUT_EXTRUDE4_DEPTH_BACK, mode=Mode.SUBTRACT)

    # M14 Clearance Hole1 (through all)
    with Locations(Plane.XY.offset(20)):
        with Locations((5, 0)):
            Hole(M14_CLEARANCE_HOLE1_D / 2)

    # CBORE for M4 SHCS2 (through all)
    with Locations(Plane.XY.offset(20)):
        with Locations((49.5, 0)):
            CounterBoreHole(CBORE_FOR_M4_SHCS2_D / 2, CBORE_FOR_M4_SHCS2_CBORE_D / 2, CBORE_FOR_M4_SHCS2_CBORE_DEPTH)

    # Sketch16 → Boss-Extrude3 (add, up to next)
    with BuildSketch(Plane(origin=(0, 0, 0), x_dir=(-1, 0, 0), z_dir=(0, 0, -1)), mode=Mode.PRIVATE) as boss_extrude3_sk1:
        with Locations((47, 9.78245603)):
            Rectangle(SKETCH16_W, SKETCH16_H)
    boss_extrude3_tool1 = extrude(boss_extrude3_sk1.sketch, amount=-BOSS_EXTRUDE3_REACH, mode=Mode.PRIVATE) - part.part
    # Sketch16 → Boss-Extrude3 (add, up to next)
    with BuildSketch(Plane(origin=(0, 0, 0), x_dir=(-1, 0, 0), z_dir=(0, 0, -1)), mode=Mode.PRIVATE) as boss_extrude3_sk2:
        with Locations((47, -9.78245603)):
            Rectangle(SKETCH16_W, SKETCH16_H)
    boss_extrude3_tool2 = extrude(boss_extrude3_sk2.sketch, amount=-BOSS_EXTRUDE3_REACH, mode=Mode.PRIVATE) - part.part
    add(boss_extrude3_tool1.solids().sort_by_distance((-47, 9.782456, 0))[0])
    add(boss_extrude3_tool2.solids().sort_by_distance((-47, -9.782456, 0))[0])

    # Sketch18 → Cut-Extrude5 (cut, two sides: drawn at the far end of the back side and taken through both)
    with BuildSketch(Plane(origin=(0, 0, 0), x_dir=(1, 0, 0), z_dir=(0, 1, 0)).offset(-CUT_EXTRUDE5_DEPTH_BACK)):
        with Locations((-52.75, -2.625)):
            Rectangle(SKETCH18_W, SKETCH18_H)
    extrude(amount=CUT_EXTRUDE5_DEPTH + CUT_EXTRUDE5_DEPTH_BACK, mode=Mode.SUBTRACT)


solid = part.part
